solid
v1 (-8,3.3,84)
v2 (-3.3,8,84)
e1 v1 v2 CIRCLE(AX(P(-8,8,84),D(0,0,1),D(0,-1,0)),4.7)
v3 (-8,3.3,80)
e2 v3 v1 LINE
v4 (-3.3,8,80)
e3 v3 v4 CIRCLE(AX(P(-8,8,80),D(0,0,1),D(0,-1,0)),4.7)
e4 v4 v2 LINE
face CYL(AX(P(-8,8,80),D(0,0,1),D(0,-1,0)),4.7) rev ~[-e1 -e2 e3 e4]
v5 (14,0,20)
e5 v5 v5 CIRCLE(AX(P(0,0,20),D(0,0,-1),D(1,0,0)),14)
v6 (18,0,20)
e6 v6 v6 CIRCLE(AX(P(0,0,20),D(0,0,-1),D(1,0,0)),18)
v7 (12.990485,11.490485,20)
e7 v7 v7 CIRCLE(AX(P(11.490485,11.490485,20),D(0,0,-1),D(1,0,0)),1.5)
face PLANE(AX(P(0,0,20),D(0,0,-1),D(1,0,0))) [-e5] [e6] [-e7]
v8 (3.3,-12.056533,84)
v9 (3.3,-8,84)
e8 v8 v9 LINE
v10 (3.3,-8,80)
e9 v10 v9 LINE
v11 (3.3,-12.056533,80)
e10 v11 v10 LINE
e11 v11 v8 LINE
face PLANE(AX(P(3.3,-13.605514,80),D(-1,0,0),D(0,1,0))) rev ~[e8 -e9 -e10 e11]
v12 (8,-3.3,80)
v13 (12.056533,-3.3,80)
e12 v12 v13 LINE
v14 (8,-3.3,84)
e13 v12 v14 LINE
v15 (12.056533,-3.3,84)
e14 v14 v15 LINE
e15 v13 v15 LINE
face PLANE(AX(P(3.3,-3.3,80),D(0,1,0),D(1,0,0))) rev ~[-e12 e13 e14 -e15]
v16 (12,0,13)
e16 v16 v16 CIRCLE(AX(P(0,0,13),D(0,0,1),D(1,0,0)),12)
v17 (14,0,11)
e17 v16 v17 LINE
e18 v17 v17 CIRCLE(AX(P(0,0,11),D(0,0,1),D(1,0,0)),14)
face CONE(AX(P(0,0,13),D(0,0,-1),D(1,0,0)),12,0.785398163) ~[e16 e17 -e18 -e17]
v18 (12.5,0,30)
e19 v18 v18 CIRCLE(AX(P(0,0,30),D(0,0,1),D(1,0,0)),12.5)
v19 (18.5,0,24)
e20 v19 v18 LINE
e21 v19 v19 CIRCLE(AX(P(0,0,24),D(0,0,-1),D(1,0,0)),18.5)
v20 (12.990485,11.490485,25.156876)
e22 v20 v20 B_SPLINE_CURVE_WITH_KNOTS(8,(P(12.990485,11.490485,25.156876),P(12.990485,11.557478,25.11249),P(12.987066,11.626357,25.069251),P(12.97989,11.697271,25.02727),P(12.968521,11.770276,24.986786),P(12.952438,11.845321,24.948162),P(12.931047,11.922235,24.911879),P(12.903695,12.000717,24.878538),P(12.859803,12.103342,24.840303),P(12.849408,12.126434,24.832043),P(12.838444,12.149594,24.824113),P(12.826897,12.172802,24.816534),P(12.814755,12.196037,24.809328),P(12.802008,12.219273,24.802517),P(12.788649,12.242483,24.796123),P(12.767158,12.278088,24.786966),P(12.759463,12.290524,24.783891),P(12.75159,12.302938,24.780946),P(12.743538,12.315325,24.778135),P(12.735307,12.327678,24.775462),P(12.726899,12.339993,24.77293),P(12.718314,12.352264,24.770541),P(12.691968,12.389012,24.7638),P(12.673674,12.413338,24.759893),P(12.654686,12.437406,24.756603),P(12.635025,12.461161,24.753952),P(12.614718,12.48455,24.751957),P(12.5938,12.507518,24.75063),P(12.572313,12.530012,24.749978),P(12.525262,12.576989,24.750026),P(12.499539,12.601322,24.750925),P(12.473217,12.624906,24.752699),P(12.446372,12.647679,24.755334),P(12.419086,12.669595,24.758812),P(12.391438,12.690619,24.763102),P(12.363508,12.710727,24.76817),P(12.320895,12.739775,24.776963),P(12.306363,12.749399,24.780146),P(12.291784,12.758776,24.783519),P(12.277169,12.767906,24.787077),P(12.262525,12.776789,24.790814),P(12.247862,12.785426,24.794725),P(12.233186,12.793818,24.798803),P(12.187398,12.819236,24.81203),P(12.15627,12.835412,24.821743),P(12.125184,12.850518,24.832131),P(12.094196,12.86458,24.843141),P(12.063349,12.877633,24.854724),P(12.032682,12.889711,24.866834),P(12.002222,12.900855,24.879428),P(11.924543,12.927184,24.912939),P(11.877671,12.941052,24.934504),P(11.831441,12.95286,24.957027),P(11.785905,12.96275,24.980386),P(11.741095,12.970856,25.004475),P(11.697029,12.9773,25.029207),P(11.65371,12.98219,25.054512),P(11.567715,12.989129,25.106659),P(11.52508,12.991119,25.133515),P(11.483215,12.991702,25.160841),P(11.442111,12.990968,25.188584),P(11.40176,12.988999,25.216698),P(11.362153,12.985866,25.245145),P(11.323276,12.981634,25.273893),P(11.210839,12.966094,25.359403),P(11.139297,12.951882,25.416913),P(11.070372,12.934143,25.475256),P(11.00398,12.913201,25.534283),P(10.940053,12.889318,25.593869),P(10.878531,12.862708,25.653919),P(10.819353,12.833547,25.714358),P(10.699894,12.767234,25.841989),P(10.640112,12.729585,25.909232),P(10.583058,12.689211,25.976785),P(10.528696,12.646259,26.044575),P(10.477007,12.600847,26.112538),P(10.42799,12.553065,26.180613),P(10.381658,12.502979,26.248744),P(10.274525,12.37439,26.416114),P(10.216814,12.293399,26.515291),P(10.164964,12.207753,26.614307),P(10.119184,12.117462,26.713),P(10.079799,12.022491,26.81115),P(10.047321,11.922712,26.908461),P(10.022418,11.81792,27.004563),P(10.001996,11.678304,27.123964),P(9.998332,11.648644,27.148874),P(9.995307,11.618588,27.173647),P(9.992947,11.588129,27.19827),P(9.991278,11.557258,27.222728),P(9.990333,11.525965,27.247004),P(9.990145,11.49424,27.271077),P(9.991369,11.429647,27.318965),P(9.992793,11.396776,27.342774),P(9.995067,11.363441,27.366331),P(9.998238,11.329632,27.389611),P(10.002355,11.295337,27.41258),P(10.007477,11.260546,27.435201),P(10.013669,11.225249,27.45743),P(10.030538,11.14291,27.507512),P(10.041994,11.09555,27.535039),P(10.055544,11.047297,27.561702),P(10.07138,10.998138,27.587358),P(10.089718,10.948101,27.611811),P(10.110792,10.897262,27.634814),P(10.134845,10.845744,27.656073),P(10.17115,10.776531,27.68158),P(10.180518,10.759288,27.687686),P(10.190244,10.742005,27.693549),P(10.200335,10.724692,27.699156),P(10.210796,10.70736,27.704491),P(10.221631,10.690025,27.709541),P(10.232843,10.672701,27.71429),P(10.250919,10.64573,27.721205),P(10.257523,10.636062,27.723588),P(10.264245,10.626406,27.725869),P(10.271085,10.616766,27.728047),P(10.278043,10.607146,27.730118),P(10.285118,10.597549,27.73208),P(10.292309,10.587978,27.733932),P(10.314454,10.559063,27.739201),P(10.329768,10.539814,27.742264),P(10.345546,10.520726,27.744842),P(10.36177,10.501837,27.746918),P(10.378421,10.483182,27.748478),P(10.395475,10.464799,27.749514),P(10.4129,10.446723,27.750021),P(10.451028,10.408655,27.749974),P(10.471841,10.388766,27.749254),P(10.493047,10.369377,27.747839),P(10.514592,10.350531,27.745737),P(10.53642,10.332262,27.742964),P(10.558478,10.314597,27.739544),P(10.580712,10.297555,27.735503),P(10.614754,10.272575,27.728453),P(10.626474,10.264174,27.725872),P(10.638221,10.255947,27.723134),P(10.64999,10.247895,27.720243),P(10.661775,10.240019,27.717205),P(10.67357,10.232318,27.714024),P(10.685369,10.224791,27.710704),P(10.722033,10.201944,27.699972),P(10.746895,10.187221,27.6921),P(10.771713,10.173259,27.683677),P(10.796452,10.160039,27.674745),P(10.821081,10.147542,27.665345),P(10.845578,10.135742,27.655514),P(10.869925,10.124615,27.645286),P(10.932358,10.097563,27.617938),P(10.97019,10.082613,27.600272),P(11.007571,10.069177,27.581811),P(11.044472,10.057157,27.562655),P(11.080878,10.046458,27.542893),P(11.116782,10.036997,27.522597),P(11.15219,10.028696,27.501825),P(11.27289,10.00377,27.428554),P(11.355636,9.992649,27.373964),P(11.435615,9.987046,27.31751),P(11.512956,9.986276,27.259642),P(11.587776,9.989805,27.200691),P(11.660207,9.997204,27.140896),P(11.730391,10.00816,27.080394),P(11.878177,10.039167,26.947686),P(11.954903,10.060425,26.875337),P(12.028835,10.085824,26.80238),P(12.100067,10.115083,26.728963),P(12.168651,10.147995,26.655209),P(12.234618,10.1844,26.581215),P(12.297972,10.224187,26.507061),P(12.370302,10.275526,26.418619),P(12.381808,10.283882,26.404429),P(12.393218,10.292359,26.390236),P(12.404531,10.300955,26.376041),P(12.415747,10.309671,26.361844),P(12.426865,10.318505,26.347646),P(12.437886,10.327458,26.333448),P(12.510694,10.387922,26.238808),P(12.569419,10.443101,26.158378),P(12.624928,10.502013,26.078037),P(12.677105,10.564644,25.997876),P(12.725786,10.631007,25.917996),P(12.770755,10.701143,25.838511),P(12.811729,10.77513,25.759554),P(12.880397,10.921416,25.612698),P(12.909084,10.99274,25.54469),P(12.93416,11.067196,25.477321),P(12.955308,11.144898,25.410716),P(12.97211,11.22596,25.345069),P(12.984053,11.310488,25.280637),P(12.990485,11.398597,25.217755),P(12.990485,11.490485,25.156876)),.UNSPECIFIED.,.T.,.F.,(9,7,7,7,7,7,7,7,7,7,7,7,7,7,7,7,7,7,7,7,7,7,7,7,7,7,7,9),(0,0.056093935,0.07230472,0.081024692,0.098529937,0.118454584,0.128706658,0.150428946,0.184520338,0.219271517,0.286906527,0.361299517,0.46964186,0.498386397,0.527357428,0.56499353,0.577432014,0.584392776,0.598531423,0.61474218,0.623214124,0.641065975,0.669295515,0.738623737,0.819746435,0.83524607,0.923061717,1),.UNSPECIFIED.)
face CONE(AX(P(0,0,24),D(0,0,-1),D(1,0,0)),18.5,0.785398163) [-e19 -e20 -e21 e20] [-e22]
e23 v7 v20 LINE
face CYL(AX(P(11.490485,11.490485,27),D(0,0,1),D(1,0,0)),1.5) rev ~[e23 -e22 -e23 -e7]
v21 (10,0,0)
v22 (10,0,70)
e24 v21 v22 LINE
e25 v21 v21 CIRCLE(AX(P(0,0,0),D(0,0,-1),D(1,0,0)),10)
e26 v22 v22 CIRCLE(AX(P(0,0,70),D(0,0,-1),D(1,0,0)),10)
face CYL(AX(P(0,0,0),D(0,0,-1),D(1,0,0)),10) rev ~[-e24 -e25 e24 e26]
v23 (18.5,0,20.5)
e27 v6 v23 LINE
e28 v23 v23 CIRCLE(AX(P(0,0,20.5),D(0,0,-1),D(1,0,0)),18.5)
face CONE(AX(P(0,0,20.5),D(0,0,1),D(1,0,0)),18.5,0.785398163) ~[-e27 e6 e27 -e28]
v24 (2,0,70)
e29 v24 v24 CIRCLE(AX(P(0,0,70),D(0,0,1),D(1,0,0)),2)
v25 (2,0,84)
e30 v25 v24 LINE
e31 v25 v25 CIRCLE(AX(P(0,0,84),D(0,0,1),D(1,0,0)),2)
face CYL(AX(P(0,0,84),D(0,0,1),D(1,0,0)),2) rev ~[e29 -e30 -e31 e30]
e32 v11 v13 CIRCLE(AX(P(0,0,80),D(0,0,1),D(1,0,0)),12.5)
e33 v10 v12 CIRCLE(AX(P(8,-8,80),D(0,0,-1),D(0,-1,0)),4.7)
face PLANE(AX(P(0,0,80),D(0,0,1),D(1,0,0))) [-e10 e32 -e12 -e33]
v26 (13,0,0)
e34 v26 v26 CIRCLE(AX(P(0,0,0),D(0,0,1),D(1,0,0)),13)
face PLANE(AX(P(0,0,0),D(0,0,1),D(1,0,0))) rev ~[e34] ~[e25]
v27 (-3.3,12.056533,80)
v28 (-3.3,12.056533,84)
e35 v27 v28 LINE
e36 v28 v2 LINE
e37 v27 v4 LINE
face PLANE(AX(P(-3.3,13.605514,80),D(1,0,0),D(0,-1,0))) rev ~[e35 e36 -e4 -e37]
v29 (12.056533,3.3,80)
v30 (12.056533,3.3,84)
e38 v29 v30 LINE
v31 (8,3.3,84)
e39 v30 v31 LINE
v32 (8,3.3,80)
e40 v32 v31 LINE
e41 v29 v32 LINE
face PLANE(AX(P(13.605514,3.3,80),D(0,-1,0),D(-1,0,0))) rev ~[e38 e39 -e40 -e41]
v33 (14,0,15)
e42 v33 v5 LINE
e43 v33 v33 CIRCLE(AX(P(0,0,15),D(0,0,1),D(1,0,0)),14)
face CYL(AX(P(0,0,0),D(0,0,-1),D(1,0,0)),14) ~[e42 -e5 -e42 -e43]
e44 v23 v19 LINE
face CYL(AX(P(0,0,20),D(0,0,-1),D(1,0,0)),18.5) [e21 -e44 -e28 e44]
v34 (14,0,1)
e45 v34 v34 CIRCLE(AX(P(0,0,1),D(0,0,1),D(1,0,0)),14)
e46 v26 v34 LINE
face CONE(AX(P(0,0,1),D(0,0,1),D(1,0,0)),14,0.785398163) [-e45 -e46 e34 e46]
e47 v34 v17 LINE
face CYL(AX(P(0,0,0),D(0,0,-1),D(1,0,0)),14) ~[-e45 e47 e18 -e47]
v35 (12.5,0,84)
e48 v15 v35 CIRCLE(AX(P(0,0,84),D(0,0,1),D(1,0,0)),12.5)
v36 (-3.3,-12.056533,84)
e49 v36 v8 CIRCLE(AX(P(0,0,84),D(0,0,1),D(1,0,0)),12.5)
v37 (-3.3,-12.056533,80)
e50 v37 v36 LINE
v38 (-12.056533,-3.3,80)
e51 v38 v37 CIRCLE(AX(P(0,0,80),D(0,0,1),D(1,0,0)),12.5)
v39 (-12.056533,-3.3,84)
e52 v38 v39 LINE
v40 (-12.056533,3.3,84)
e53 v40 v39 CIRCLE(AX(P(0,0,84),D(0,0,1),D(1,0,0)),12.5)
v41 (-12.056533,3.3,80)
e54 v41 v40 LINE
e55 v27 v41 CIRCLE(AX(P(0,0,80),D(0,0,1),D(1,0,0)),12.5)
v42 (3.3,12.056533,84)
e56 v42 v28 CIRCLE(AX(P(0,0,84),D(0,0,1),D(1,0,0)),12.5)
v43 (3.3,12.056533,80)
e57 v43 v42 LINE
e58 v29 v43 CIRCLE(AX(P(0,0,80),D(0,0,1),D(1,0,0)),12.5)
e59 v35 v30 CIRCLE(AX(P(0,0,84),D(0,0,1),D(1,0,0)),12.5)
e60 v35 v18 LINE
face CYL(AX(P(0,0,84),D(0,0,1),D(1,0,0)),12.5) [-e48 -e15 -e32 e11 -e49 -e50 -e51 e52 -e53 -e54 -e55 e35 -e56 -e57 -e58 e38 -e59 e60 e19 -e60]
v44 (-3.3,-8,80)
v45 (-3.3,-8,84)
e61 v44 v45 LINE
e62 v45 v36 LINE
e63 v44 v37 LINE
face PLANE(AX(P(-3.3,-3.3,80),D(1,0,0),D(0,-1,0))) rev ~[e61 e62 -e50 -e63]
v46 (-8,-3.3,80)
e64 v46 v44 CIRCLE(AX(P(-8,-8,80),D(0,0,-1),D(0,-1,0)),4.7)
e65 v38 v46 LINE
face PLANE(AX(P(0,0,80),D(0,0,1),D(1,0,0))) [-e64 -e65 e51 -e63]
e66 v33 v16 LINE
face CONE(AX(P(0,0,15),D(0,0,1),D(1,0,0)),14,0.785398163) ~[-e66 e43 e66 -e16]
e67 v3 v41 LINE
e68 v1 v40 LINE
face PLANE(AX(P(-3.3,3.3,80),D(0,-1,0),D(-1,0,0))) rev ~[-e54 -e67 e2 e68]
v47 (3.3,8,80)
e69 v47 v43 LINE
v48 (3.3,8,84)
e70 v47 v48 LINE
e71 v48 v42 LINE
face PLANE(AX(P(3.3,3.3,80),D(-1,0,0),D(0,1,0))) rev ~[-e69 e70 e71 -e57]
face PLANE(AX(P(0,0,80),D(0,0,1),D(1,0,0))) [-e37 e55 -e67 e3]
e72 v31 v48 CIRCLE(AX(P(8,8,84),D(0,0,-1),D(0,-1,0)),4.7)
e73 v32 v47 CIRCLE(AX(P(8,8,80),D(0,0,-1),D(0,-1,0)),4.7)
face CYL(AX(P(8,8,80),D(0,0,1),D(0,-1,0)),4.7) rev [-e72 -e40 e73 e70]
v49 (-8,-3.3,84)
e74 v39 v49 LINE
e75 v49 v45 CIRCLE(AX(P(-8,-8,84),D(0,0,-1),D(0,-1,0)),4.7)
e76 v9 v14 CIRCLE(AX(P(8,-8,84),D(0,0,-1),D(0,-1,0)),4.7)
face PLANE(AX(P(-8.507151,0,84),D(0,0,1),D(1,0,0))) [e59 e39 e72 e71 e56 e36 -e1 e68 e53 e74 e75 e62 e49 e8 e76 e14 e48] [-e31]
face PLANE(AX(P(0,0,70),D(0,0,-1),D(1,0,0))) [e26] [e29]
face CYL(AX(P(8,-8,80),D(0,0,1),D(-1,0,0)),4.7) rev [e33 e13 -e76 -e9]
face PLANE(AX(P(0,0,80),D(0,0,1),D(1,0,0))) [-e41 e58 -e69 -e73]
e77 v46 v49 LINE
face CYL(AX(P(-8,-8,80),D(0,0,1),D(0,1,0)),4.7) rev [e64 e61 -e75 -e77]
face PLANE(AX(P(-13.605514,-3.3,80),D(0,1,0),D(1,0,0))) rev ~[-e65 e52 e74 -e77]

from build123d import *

# Parameters (mm, degrees)
F0_R         = 14
F1_DEPTH     = 80
F3_R         = 18.5
F4_DEPTH     = 4
F8_DEPTH     = 4
F9_R         = 4.7
F10_R        = 2
F11_DEPTH    = 84.001
F12_R        = 10
F12_R_2      = 2
F13_DEPTH    = 70
F14_SIZE     = 1
F15_SIZE     = 0.5
F16_R        = 1.5
F17_DEPTH    = 25
F18_R        = 14
F18_R_2      = 12.5
F19_DEPTH    = 60
F20_S5_R     = 1.5
F20_T6_DEPTH = 28
F20_S7_R     = 18.5
F20_T8_DEPTH = 28


# Not quite as in the source:
# - a fillet or chamfer that OpenCascade refuses, or shapes differently, is made with other operations: its cross-section is extruded or revolved along the edge and cut away or added


with BuildPart() as f1:
    # F0 (on Top) → F1 (new body)
    with BuildSketch(Plane.XY):
        Circle(F0_R)
    extrude(amount=F1_DEPTH)

    # F3 (on offset) → F4 (join)
    with BuildSketch(Plane(origin=(0, 0, 20), x_dir=(1, 0, 0), z_dir=(0, 0, -1))):
        Circle(F3_R)
    extrude(amount=-F4_DEPTH)

    # F5 (on Front) → F6 (revolve, cut)
    with BuildSketch(Plane.XZ):
        Polygon((14, 15), (12, 13), (14, 11), align=None)
    revolve(axis=Axis((0, 0, 15.3274592012), (0, 0, 1)), mode=Mode.SUBTRACT)

    # F7 (on face) → F8 (join)
    with BuildSketch(Plane.XY.offset(80)):
        with BuildLine():
            Line((-3.3, -3.3), (-3.3, 0))
            Line((-3.3, 0), (-3.3, 3.3))
            Line((-3.3, 3.3), (-13.6055135882, 3.3))
            ThreePointArc((-13.6055135882, 3.3), (-14, 0), (-13.6055135882, -3.3))
            Line((-13.6055135882, -3.3), (-3.3, -3.3))
        make_face()
        Polygon((-3.3, 3.3), (-3.3, 0), (-3.3, -3.3), (0, -3.3), (3.3, -3.3), (3.3, 0), (3.3, 3.3), (0, 3.3), align=None)
        with BuildLine():
            Line((-3.3, 13.6055135882), (-3.3, 3.3))
            Line((-3.3, 3.3), (0, 3.3))
            Line((0, 3.3), (3.3, 3.3))
            Line((3.3, 3.3), (3.3, 13.6055135882))
            ThreePointArc((3.3, 13.6055135882), (0, 14), (-3.3, 13.6055135882))
        make_face()
        with BuildLine():
            Line((0, -3.3), (-3.3, -3.3))
            Line((-3.3, -3.3), (-3.3, -13.6055135882))
            ThreePointArc((-3.3, -13.6055135882), (0, -14), (3.3, -13.6055135882))
            Line((3.3, -13.6055135882), (3.3, -3.3))
            Line((3.3, -3.3), (0, -3.3))
        make_face()
        with BuildLine():
            Line((13.6055135882, 3.3), (3.3, 3.3))
            Line((3.3, 3.3), (3.3, 0))
            Line((3.3, 0), (3.3, -3.3))
            Line((3.3, -3.3), (13.6055135882, -3.3))
            ThreePointArc((13.6055135882, -3.3), (14, 0), (13.6055135882, 3.3))
        make_face()
    extrude(amount=F8_DEPTH)

    # F9
    f9_edges = [f1.edges().sort_by_distance(p)[0] for p in [
        (-3.3, 3.3, 82),
        (3.3, 3.3, 82),
        (3.3, -3.3, 82),
        (-3.3, -3.3, 82),
    ]]
    fillet(f9_edges, radius=F9_R)

    # F10 (on face) → F11 (cut, through all)
    with BuildSketch(Plane.XY.offset(84)):
        Circle(F10_R)
    extrude(amount=-F11_DEPTH, mode=Mode.SUBTRACT)

    # F12 (on face) + F8_face1 (on face) → F13 (cut)
    with BuildSketch(Plane(origin=(0, 0, 0), x_dir=(1, 0, 0), z_dir=(0, 0, -1))):
        Circle(F12_R)
        Circle(F12_R_2, mode=Mode.SUBTRACT)
        Circle(F12_R)
    with BuildSketch(Plane(origin=(-7.5775327369, -7.5775327369, 80), x_dir=(1, 0, 0), z_dir=(0, 0, 1))):
        with BuildLine():
            Line((-0.4224672631, 4.2775327369), (-6.0279808513, 4.2775327369))
            ThreePointArc((-6.0279808513, 4.2775327369), (-2.3219621997, -2.3219621997), (4.2775327369, -6.0279808513))
            Line((4.2775327369, -6.0279808513), (4.2775327369, -0.4224672631))
            ThreePointArc((4.2775327369, -0.4224672631), (2.9009346085, 2.9009346085), (-0.4224672631, 4.2775327369))
        make_face()
    extrude(amount=-F13_DEPTH, dir=(0, 0, -1), mode=Mode.SUBTRACT)

    # F14
    f14_edges = [f1.edges().sort_by_distance(p)[0] for p in [
        (-14, 0, 0),
    ]]
    chamfer(f14_edges, length=F14_SIZE)

    # F15
    f15_edges = [f1.edges().sort_by_distance(p)[0] for p in [
        (-18.5, 0, 20),
    ]]
    chamfer(f15_edges, length=F15_SIZE)

    # F16 (on face) → F17 (cut)
    with BuildSketch(Plane(origin=(0, 0, 20), x_dir=(1, 0, 0), z_dir=(0, 0, -1))):
        with Locations((11.4904851943, -11.4904851943)):
            Circle(F16_R)
    extrude(amount=-F17_DEPTH, mode=Mode.SUBTRACT)

    # F18 (on face) → F19 (cut, through all)
    with BuildSketch(Plane.XY.offset(84)):
        Circle(F18_R)
        Circle(F18_R_2, mode=Mode.SUBTRACT)
    extrude(amount=-F19_DEPTH, mode=Mode.SUBTRACT)

    # F20: chamfer of 6 on 1 edges, made by hand


with BuildPart() as f20_tool2:
    # F20_s3 → F20_t4 (revolve)
    with BuildSketch(Plane.XZ):
        Polygon((18.5, 24), (12.5, 30), (12.5, 24), align=None)
    revolve(axis=Axis((0, 0, 24), (0, 0, 1)))

    # F20_s5 → F20_t6 (cut, symmetric)
    with BuildSketch(Plane.XY.offset(27)):
        with Locations((11.4904851943, 11.4904851943)):
            Circle(F20_S5_R)
    extrude(amount=F20_T6_DEPTH, both=True, mode=Mode.SUBTRACT)

    # F20_s7 → F20_t8 (intersect, symmetric)
    with BuildSketch(Plane.XY.offset(27)):
        Circle(F20_S7_R)
    extrude(amount=F20_T8_DEPTH, both=True, mode=Mode.INTERSECT)


with BuildPart() as f1_1:
    add(f1.part)

    # F20_t1: union F20_tool2
    add(f20_tool2.part)


solid = f1_1.part
